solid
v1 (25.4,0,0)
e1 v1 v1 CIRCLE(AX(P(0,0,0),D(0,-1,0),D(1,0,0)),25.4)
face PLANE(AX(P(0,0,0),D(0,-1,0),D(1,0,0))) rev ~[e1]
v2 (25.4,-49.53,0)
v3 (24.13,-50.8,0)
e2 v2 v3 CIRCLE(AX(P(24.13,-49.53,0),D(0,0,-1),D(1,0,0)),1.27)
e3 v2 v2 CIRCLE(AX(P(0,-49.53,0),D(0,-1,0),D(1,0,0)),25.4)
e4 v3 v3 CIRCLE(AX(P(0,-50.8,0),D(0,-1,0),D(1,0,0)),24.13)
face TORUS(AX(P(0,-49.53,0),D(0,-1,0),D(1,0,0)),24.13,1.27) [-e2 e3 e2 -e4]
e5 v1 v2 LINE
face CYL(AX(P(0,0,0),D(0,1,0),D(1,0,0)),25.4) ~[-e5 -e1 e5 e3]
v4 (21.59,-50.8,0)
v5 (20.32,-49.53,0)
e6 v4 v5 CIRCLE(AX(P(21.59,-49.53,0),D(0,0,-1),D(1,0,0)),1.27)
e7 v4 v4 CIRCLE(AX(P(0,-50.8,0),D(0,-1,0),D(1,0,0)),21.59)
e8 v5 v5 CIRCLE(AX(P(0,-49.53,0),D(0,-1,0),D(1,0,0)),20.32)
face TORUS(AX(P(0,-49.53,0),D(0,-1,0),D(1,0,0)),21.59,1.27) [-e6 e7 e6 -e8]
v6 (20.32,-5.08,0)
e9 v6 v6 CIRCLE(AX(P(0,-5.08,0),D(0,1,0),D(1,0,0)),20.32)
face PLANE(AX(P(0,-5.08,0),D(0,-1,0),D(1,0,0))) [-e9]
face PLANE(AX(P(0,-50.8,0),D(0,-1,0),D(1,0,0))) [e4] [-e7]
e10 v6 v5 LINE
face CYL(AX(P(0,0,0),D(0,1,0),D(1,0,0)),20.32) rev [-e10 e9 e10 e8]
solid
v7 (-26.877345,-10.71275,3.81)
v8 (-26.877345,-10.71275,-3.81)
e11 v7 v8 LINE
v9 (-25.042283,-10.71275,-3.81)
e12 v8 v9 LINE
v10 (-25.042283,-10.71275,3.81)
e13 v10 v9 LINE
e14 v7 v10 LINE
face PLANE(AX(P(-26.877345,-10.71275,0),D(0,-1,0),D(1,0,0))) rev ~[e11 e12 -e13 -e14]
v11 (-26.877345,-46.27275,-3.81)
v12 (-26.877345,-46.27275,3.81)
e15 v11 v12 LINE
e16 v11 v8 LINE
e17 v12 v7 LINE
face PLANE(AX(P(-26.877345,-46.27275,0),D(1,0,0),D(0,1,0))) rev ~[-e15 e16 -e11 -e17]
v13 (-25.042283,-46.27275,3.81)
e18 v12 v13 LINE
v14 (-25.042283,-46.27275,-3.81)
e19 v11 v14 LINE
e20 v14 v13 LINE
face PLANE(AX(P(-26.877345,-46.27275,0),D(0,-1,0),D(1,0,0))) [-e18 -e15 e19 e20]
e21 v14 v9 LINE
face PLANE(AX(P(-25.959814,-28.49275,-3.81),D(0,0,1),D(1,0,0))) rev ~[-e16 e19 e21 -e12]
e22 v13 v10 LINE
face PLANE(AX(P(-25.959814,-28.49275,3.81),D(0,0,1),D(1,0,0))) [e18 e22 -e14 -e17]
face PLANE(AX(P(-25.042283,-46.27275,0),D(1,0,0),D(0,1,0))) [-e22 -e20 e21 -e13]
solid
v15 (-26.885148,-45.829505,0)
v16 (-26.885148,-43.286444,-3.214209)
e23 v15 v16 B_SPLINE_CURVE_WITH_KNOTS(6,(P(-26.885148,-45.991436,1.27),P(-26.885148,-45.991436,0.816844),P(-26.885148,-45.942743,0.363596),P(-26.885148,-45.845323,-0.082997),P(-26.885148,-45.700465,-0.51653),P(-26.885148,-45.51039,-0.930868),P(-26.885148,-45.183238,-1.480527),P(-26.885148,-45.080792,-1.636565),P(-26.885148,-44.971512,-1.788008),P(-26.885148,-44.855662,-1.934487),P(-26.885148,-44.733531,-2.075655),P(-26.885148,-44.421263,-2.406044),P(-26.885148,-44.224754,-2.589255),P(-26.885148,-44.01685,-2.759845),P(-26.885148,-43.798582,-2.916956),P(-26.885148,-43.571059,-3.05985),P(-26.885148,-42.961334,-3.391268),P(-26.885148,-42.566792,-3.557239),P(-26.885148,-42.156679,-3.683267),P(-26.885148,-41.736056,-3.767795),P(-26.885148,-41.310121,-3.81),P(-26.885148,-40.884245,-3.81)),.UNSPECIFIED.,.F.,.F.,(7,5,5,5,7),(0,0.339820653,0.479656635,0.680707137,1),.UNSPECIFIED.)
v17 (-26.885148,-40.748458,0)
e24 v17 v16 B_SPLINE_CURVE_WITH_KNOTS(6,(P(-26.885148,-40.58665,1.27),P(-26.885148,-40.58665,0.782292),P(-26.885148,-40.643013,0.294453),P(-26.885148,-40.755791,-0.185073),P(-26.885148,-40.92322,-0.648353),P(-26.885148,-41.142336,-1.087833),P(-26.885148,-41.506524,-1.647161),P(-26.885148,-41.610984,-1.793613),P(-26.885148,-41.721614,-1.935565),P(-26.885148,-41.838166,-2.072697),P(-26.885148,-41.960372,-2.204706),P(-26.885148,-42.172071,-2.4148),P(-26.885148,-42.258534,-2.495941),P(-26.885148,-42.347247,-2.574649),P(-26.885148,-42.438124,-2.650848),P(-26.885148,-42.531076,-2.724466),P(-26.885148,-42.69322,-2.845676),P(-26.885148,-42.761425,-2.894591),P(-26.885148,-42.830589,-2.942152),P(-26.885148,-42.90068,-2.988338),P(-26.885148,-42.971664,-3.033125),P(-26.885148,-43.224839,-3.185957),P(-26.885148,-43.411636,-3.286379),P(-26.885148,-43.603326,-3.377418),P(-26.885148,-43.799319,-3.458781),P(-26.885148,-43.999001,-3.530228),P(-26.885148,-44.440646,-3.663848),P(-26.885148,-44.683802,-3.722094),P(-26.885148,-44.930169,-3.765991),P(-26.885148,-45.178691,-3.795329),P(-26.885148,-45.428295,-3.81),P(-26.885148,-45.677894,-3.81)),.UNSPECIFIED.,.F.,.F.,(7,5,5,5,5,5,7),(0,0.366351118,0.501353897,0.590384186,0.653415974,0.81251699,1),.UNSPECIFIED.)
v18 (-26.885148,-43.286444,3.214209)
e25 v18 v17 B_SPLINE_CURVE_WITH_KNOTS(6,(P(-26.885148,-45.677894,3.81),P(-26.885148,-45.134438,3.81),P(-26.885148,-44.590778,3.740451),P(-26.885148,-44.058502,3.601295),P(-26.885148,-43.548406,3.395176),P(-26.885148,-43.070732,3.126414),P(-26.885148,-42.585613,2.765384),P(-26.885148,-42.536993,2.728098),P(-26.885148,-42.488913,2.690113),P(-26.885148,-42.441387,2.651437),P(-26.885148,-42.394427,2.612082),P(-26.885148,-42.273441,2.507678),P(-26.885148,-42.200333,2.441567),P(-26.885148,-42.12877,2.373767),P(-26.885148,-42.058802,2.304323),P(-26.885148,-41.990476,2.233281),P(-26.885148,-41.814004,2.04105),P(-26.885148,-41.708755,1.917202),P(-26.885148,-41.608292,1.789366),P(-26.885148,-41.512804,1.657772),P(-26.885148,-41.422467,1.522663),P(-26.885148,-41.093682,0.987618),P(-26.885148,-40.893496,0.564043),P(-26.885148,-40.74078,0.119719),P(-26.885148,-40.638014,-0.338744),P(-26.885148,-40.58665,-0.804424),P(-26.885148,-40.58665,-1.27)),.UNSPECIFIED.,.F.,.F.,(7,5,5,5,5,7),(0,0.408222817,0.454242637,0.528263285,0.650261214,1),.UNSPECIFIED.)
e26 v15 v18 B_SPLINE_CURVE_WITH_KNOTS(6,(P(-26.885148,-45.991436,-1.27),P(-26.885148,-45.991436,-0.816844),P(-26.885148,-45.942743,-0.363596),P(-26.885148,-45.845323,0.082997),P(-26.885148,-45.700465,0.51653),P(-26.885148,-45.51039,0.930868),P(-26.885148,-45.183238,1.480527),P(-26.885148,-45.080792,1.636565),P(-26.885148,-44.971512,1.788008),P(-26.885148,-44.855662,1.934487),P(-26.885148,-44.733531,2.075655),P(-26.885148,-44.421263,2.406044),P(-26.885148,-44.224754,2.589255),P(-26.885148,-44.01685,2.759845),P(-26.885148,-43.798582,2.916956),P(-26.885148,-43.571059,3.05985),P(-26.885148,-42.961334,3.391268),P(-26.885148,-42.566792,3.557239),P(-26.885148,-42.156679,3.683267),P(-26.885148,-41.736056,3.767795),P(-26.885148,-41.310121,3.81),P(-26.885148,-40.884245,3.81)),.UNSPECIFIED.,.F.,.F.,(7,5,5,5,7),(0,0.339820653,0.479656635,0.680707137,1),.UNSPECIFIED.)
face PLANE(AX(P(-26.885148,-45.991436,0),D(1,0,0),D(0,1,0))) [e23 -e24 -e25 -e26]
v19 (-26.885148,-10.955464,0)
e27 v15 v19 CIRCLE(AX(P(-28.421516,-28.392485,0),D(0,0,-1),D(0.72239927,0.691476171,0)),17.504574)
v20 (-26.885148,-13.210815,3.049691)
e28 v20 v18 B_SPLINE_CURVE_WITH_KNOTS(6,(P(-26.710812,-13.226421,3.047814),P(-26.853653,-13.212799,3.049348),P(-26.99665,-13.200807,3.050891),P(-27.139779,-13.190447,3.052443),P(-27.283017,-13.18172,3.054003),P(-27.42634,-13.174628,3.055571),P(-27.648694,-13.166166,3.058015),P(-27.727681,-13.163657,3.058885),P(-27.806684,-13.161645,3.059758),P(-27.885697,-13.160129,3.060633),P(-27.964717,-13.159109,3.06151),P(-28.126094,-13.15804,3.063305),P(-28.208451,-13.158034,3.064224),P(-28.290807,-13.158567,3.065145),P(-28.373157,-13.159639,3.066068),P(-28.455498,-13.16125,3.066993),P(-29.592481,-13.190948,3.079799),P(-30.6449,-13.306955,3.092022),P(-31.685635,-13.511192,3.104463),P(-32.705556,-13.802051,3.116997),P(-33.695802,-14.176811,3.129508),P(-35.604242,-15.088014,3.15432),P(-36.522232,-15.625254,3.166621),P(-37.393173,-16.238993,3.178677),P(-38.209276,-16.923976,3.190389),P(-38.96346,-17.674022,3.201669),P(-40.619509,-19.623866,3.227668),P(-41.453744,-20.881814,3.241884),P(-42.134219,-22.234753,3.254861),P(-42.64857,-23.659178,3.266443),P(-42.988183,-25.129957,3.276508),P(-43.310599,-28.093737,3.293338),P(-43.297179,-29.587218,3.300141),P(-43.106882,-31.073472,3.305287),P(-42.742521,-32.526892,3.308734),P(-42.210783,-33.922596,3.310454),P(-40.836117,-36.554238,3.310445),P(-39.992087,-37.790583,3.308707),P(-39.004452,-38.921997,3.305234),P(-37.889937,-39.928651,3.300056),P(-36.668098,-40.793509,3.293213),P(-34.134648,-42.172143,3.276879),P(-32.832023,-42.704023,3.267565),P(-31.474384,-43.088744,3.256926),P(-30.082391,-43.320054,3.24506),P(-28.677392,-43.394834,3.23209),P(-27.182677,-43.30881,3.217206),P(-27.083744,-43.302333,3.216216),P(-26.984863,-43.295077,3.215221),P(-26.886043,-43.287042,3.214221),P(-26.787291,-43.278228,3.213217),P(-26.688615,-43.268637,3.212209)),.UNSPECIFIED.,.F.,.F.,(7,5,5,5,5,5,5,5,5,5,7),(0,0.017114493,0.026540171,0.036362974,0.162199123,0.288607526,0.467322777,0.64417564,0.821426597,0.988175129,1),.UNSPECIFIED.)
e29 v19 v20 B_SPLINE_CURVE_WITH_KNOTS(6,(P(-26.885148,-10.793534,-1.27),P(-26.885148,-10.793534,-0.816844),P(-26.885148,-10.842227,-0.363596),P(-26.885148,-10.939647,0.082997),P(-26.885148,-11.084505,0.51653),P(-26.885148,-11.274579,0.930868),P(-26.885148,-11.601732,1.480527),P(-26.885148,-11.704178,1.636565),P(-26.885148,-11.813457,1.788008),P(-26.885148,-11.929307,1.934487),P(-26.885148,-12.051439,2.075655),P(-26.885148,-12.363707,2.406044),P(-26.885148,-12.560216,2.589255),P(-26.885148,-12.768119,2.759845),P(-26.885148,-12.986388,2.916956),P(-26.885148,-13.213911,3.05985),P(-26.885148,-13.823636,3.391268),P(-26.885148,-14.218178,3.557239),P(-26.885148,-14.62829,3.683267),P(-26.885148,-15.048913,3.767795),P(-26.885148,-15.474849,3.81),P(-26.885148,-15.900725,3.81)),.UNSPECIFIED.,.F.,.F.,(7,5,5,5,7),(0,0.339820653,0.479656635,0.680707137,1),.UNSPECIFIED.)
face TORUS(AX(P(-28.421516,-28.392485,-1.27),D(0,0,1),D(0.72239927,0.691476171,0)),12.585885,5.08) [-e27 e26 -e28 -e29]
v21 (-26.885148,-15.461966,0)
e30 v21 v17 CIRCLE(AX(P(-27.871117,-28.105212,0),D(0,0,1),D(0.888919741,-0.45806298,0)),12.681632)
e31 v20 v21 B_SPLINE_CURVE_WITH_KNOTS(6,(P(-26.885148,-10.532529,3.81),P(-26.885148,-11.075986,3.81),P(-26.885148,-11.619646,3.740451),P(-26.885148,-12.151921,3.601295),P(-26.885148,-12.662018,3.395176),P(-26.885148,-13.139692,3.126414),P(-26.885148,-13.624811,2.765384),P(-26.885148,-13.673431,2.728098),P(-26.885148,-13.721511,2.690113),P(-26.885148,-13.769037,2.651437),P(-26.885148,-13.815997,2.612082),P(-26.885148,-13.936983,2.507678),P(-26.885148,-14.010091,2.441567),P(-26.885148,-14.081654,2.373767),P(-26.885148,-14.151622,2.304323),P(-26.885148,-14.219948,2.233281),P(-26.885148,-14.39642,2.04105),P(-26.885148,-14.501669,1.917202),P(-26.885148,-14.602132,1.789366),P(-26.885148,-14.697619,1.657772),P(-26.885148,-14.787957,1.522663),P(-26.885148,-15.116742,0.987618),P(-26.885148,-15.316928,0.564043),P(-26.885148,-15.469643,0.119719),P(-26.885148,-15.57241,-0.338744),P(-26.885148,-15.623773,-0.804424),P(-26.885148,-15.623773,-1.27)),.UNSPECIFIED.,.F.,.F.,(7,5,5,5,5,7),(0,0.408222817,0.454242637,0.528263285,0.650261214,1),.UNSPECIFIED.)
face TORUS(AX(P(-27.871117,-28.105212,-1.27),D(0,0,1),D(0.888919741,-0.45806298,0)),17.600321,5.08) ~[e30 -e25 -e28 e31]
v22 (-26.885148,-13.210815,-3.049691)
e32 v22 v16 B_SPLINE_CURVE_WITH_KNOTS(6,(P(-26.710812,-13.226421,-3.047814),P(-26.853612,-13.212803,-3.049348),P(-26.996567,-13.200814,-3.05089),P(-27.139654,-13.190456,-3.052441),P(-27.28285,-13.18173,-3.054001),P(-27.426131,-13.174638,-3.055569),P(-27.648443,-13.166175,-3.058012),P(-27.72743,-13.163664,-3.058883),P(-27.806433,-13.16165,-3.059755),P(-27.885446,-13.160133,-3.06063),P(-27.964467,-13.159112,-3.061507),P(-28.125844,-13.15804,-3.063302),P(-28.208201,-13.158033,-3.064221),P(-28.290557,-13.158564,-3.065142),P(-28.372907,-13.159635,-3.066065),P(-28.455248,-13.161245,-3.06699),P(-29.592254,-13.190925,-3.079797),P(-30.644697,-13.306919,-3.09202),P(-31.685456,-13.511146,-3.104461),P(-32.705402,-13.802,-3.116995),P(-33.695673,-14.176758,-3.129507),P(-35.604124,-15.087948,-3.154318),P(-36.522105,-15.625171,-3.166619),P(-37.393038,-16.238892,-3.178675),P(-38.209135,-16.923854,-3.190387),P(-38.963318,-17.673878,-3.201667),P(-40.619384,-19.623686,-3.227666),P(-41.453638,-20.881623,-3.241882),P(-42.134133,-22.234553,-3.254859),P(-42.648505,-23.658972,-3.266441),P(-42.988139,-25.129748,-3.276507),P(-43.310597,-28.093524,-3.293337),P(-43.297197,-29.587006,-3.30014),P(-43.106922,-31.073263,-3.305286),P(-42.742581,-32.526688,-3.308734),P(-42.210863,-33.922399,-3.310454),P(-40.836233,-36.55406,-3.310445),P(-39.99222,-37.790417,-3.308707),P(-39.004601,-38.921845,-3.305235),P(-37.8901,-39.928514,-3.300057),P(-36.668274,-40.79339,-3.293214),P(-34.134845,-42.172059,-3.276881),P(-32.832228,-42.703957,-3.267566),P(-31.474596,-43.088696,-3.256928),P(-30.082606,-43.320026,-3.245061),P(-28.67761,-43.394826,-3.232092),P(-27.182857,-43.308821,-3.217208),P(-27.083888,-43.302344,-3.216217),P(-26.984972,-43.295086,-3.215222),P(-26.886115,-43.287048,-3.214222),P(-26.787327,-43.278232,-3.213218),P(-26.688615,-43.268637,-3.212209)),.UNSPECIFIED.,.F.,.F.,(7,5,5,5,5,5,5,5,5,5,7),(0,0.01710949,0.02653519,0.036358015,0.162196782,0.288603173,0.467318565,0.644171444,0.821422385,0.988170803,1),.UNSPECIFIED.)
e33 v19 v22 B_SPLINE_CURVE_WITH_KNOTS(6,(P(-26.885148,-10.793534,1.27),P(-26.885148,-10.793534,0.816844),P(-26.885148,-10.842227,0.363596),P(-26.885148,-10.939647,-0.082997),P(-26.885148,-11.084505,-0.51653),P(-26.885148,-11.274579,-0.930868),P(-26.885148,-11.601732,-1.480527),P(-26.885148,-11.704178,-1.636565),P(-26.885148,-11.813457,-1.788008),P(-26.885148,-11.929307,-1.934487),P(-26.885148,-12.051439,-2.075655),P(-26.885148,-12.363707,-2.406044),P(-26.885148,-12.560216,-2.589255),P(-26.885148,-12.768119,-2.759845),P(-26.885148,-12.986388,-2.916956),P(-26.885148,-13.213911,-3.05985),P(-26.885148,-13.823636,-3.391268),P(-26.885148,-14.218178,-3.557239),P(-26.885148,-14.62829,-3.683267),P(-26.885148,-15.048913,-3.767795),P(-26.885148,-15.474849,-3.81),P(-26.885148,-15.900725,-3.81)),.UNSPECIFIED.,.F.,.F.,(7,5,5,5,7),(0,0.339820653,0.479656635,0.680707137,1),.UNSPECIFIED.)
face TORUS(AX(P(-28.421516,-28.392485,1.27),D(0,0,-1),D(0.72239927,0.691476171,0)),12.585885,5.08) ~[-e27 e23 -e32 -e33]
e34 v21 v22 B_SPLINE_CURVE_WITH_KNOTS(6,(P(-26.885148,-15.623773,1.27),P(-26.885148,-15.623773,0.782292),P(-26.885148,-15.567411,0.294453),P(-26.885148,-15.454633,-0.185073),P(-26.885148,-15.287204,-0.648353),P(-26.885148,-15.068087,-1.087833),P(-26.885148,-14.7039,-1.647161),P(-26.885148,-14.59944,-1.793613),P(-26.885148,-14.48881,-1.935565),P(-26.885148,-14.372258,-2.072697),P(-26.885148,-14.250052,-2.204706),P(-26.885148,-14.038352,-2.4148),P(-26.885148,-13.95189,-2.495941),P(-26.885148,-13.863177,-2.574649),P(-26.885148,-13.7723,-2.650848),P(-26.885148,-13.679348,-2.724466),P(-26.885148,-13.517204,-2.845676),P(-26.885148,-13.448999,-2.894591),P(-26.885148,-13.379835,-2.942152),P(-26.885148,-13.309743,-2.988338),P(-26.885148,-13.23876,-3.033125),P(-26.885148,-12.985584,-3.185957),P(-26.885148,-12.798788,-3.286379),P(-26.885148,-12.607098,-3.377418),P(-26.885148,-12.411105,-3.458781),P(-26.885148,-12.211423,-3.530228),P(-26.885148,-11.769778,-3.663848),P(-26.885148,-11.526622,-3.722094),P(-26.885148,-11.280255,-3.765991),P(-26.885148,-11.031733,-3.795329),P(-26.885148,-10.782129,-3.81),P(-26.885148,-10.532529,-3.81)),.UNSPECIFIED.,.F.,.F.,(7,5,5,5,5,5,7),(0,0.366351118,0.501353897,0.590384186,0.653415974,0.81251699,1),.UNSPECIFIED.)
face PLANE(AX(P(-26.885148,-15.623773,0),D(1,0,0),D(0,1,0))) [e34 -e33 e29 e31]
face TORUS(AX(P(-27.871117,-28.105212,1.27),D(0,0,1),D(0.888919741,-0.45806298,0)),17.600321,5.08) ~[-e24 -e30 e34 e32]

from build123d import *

# Parameters (mm, degrees)
F0_R        = 25.4
F1_DEPTH    = 50.8
F2_T        = -5.08
F3_R        = 1.27
F5_DEPTH    = 3.81
F6_W        = 1.8350626505
F6_H        = 35.56
F7_DEPTH    = 3.81
F8_T2_ANGLE = 305.4756287564
F8_T4_ANGLE = 305.4756287564
F8_T6_ANGLE = 272.5058510715
F8_T8_ANGLE = 272.5058510715


# Not quite as in the source:
# - a fillet or chamfer that OpenCascade refuses, or shapes differently, is made with other operations: its cross-section is extruded or revolved along the edge and cut away or added


with BuildPart() as f1:
    # F0 (on Front) → F1 (new body)
    with BuildSketch(Plane.XZ):
        Circle(F0_R)
    extrude(amount=F1_DEPTH)

    # F2
    f2_openings = [f1.faces().sort_by_distance(p)[0] for p in [
        (0, -50.8, 0),
    ]]
    offset(amount=F2_T, openings=f2_openings)

    # F3
    f3_edges = [f1.edges().sort_by_distance(p)[0] for p in [
        (-25.4, -50.8, 0),
        (-20.32, -50.8, 0),
    ]]
    fillet(f3_edges, radius=F3_R)


with BuildPart() as f5:
    # F4 (on Top) → F5 (new body, symmetric)
    with BuildSketch(Plane.XY):
        with BuildLine():
            ThreePointArc((-26.8851481378, -40.5866503716), (-40.3914383995, -28.1052119099), (-26.8851481378, -15.6237734482))
            Line((-26.8851481378, -15.6237734482), (-26.8851481378, -10.7935341075))
            ThreePointArc((-26.8851481378, -10.7935341075), (-46.0874012872, -28.3924848773), (-26.8851481378, -45.991435647))
            Line((-26.8851481378, -45.991435647), (-26.8851481378, -40.5866503716))
        make_face()
    extrude(amount=F5_DEPTH, both=True)

    # F8: fillet of radius 5.08 on 4 edges, made by hand

    # F8_s1 → F8_t2 (revolve, cut)
    with BuildSketch(Plane(origin=(-17.2918796722, -33.5567244349, 0), x_dir=(0, 0, 1), z_dir=(0.4580629802, 0.8889197411, 0))):
        with BuildLine():
            ThreePointArc((1.27, 0.61909191), (-2.3221024484, 2.1069894616), (-3.81, 5.69909191))
            Line((-3.81, 5.69909191), (-3.81, 0.61909191))
            Line((-3.81, 0.61909191), (1.27, 0.61909191))
        make_face()
    revolve(axis=Axis((-27.8711172694, -28.1052119099, -3.81), (0, 0, -1)), revolution_arc=F8_T2_ANGLE, mode=Mode.SUBTRACT)

    # F8_s3 → F8_t4 (revolve, cut)
    with BuildSketch(Plane(origin=(-17.2918796722, -33.5567244349, 0), x_dir=(0, 0, 1), z_dir=(0.4580629802, 0.8889197411, 0))):
        with BuildLine():
            ThreePointArc((3.81, 5.69909191), (2.3221024484, 2.1069894616), (-1.27, 0.61909191))
            Line((-1.27, 0.61909191), (3.81, 0.61909191))
            Line((3.81, 0.61909191), (3.81, 5.69909191))
        make_face()
    revolve(axis=Axis((-27.8711172694, -28.1052119099, 3.81), (0, 0, -1)), revolution_arc=F8_T4_ANGLE, mode=Mode.SUBTRACT)

    # F8_s5 → F8_t6 (revolve, cut)
    with BuildSketch(Plane(origin=(0.5932237272, -0.6197529366, 0), x_dir=(0, 0, 1), z_dir=(0.6914761708, -0.7223992699, 0))):
        with BuildLine():
            ThreePointArc((1.27, 22.498524229), (-2.3221024484, 23.9864217805), (-3.81, 27.578524229))
            Line((-3.81, 27.578524229), (-3.81, 22.498524229))
            Line((-3.81, 22.498524229), (1.27, 22.498524229))
        make_face()
    revolve(axis=Axis((-28.4215162233, -28.3924848773, -3.81), (0, 0, 1)), revolution_arc=F8_T6_ANGLE, mode=Mode.SUBTRACT)

    # F8_s7 → F8_t8 (revolve, cut)
    with BuildSketch(Plane(origin=(0.5932237272, -0.6197529366, 0), x_dir=(0, 0, 1), z_dir=(0.6914761708, -0.7223992699, 0))):
        with BuildLine():
            ThreePointArc((-1.27, 22.498524229), (2.3221024484, 23.9864217805), (3.81, 27.578524229))
            Line((3.81, 27.578524229), (3.81, 22.498524229))
            Line((3.81, 22.498524229), (-1.27, 22.498524229))
        make_face()
    revolve(axis=Axis((-28.4215162233, -28.3924848773, 3.81), (0, 0, 1)), revolution_arc=F8_T8_ANGLE, mode=Mode.SUBTRACT)


with BuildPart() as f7:
    # F6 (on Top) → F7 (new body, symmetric)
    with BuildSketch(Plane.XY):
        with Locations((-25.9598139673, -28.4927496687)):
            Rectangle(F6_W, F6_H)
    extrude(amount=F7_DEPTH, both=True)


solid = Compound([f1.part, f5.part, f7.part])
